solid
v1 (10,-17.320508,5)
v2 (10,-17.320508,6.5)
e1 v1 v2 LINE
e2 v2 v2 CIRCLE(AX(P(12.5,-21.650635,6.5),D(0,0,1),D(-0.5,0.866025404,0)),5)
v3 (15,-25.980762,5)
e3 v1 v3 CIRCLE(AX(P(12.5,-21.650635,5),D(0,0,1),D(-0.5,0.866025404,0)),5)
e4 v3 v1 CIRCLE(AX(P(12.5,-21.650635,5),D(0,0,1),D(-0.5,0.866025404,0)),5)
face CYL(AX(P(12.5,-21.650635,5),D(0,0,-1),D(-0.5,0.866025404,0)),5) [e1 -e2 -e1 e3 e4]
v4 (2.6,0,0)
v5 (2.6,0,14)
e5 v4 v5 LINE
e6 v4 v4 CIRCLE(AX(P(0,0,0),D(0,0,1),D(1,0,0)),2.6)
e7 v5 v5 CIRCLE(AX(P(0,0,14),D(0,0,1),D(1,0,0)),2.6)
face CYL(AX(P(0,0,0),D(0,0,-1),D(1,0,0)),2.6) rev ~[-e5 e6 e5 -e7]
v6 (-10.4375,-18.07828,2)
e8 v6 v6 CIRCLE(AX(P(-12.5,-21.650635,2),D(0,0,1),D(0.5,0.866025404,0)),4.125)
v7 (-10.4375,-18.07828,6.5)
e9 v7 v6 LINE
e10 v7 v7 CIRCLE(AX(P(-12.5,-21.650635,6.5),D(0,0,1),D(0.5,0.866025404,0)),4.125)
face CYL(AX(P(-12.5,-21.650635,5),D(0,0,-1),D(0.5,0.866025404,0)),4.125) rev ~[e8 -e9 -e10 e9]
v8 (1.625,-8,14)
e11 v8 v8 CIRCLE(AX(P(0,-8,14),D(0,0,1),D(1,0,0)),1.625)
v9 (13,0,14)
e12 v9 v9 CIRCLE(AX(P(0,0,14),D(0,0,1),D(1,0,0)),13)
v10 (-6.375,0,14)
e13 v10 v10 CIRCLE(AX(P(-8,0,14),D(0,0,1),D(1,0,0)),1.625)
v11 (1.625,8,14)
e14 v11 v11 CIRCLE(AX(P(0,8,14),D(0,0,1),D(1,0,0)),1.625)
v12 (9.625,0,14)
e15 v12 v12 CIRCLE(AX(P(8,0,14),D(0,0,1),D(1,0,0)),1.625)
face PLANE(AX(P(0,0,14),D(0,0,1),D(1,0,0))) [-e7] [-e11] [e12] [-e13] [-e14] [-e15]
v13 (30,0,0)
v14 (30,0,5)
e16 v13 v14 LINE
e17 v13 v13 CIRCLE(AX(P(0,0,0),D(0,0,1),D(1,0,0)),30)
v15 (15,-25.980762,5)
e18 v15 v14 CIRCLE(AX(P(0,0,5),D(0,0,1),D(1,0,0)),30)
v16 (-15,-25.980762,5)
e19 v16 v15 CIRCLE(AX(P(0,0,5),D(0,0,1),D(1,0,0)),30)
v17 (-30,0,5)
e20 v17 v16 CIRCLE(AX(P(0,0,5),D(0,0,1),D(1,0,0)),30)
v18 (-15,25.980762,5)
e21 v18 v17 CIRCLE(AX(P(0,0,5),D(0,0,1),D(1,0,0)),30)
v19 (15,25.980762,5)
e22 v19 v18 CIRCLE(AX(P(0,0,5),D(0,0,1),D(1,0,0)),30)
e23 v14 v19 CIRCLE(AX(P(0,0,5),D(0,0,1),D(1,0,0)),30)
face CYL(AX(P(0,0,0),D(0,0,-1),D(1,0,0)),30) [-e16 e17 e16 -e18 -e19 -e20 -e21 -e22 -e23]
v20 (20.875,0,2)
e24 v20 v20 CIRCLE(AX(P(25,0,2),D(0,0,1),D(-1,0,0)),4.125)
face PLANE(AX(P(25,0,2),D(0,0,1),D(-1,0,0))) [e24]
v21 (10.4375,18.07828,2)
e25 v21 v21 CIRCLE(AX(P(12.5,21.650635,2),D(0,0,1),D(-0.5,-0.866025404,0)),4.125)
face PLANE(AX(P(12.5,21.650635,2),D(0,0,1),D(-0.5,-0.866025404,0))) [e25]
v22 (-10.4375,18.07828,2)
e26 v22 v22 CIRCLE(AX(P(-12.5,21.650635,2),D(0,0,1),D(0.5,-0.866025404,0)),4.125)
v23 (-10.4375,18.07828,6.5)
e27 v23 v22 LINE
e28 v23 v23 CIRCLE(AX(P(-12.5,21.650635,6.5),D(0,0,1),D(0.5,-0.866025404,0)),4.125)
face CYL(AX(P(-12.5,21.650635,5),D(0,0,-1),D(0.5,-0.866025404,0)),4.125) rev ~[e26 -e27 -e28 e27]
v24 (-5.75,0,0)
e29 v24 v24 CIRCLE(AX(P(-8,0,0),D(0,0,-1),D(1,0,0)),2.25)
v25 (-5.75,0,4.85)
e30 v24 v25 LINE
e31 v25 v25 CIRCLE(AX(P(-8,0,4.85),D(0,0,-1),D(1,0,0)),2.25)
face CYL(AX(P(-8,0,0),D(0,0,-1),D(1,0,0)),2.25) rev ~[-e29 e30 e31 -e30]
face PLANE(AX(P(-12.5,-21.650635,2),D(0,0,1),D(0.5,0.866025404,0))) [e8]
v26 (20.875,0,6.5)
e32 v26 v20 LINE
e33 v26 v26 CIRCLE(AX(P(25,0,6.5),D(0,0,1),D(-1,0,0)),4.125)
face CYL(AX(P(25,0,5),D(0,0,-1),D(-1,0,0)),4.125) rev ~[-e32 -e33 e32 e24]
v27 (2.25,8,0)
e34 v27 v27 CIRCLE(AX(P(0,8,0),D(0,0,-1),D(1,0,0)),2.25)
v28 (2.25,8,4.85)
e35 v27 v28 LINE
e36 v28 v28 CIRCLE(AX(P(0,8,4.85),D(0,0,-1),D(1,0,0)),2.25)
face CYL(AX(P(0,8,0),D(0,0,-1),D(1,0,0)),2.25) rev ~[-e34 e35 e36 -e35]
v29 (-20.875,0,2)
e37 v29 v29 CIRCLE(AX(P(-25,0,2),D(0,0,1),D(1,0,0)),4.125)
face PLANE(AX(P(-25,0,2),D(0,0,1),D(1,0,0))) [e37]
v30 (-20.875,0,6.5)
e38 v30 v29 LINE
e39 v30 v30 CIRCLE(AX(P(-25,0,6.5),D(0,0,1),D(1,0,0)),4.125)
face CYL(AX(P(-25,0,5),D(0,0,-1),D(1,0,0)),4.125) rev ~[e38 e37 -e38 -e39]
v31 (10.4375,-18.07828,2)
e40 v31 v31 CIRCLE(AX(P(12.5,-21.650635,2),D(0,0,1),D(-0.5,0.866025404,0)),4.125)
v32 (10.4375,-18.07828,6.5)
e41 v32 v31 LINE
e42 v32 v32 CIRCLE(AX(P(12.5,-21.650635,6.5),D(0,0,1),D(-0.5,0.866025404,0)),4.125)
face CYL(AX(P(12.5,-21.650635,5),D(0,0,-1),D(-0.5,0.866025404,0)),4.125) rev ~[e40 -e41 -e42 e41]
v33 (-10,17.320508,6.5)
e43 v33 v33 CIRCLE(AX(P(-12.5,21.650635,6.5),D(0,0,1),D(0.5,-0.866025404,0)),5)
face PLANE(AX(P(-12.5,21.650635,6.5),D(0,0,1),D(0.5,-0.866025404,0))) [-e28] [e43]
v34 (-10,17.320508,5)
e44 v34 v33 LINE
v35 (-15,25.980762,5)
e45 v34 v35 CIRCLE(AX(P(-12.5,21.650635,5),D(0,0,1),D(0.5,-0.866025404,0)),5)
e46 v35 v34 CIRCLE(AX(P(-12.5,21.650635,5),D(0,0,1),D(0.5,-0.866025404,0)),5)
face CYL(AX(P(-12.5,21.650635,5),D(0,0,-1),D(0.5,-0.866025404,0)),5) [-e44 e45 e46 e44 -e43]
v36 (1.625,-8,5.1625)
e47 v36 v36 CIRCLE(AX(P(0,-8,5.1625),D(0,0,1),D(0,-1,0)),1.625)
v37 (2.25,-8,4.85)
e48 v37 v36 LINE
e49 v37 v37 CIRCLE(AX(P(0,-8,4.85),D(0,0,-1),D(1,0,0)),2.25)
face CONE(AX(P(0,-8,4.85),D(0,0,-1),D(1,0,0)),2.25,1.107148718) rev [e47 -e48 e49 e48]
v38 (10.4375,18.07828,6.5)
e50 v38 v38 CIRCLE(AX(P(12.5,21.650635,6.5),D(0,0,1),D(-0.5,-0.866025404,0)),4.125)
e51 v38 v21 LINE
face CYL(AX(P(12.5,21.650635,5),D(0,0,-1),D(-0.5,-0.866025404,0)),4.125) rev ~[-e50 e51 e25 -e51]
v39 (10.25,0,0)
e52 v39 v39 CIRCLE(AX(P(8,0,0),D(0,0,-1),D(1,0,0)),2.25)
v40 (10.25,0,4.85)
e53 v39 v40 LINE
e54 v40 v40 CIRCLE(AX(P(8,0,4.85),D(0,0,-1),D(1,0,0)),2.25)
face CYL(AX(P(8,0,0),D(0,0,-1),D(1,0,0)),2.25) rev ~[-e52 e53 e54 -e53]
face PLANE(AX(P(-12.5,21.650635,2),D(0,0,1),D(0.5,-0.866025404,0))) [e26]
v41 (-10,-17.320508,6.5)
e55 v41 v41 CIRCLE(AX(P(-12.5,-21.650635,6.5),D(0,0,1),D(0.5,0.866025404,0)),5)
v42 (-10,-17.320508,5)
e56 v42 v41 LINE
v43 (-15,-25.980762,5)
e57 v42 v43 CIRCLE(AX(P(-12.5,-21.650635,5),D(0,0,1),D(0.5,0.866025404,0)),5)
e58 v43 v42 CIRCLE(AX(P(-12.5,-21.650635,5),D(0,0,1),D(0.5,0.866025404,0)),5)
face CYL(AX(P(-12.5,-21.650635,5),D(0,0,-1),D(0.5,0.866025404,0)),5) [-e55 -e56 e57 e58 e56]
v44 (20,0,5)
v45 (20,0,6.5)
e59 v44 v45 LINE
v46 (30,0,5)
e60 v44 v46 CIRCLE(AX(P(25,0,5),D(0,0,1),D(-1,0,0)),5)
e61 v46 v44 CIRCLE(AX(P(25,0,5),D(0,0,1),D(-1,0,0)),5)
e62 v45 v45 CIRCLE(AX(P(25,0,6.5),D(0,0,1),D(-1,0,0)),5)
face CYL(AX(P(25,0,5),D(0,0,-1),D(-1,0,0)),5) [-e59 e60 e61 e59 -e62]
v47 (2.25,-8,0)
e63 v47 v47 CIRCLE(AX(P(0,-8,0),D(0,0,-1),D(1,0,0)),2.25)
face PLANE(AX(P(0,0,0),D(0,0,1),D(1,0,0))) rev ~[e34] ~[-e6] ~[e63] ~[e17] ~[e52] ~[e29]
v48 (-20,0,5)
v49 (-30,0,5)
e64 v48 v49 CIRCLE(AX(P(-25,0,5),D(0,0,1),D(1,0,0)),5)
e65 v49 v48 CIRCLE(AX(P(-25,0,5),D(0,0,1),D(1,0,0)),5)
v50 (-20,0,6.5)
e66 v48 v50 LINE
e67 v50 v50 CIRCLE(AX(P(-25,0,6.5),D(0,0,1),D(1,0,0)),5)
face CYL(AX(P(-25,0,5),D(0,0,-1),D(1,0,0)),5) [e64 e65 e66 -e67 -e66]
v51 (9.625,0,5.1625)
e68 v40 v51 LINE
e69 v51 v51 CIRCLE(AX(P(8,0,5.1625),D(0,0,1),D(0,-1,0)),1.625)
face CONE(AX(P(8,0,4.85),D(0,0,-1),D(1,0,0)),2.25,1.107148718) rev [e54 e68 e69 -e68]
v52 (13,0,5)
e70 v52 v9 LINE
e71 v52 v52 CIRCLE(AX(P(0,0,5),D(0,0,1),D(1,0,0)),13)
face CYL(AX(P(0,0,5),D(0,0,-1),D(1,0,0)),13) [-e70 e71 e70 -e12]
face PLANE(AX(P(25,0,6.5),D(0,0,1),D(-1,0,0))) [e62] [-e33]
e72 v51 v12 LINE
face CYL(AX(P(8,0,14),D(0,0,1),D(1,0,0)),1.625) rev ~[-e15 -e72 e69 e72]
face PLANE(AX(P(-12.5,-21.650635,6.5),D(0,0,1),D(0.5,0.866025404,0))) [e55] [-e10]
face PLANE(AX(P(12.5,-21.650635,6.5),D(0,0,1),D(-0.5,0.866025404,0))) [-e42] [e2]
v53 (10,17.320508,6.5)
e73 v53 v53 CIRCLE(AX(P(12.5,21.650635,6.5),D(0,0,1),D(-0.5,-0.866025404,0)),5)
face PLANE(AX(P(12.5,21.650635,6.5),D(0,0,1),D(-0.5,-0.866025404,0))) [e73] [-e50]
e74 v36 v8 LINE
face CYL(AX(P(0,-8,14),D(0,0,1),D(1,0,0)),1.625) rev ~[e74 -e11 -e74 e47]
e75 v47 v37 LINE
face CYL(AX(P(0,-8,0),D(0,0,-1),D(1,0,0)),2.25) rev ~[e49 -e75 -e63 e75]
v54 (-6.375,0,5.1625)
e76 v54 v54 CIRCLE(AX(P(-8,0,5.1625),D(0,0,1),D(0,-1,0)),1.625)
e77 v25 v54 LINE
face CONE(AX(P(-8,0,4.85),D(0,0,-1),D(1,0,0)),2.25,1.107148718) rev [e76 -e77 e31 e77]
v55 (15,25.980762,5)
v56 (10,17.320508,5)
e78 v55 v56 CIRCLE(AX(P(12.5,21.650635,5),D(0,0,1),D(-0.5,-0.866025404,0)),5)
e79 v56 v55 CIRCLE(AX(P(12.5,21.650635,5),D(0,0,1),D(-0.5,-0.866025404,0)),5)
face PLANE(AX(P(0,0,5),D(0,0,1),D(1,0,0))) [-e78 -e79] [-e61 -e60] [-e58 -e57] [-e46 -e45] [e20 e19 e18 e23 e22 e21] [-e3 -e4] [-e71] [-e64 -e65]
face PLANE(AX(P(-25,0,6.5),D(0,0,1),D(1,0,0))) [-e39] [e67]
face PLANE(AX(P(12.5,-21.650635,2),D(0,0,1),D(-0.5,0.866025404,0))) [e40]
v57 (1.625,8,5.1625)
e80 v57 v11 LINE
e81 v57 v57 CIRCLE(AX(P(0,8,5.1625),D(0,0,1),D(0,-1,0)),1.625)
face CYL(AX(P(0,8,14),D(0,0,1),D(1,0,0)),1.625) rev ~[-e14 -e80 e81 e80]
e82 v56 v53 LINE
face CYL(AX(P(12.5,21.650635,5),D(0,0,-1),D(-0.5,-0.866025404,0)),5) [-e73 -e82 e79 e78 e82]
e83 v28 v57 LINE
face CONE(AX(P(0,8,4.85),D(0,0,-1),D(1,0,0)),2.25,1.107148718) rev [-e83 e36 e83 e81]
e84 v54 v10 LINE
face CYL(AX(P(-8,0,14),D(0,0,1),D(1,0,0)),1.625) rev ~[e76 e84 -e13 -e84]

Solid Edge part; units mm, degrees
sketch "Sketch1" plane through (0, 0, 0) normal (0, 0, 1) x (1, 0, 0)
  circle A0 centre (0, 0) radius 30
  circle A1 centre (0, 0) radius 2.6
extrude "Protrusion1" add sketch "Sketch1" along normal blind 5
sketch "Sketch2" plane through (0, 0, 5) normal (0, 0, 1) x (1, 0, 0)
  circle A0 centre (-25, 0) radius 4.125
extrude "ExtrudedCutout_1" cut sketch "Sketch2" against normal blind 3
sketch "Sketch3" plane through (0, 0, 5) normal (0, 0, 1) x (1, 0, 0)
  circle A0 centre (-25, 0) radius 5
  circle A1 centre (-25, 0) radius 4.125
  dimension "D1" = 25
extrude "ExtrudedProtrusion_2" add sketch "Sketch3" along normal blind 1.5
sketch "Sketch4" plane through (0, 0, 5) normal (0, 0, 1) x (1, 0, 0)
  circle A0 centre (0, 0) radius 2.6
  circle A1 centre (0, 0) radius 13
extrude "ExtrudedProtrusion_3" add sketch "Sketch4" along normal blind 9
pattern_circular "Pattern1" count 6 over 360 about axis through (0, 0, 0) along (0, 0, -1) of "ExtrudedCutout_1", "ExtrudedProtrusion_2"
sketch "Sketch5" plane through (0, 0, 14) normal (0, 0, 1) x (1, 0, 0)
  circle A0 centre (-8, 0) radius 1.625
  circle A1 centre (0, 8) radius 1.625
  circle A2 centre (8, 0) radius 1.625
  circle A3 centre (0, -8) radius 1.625
  dimension "D1" = 8
  dimension "D2" = 8
  dimension "D3" = 8
  dimension "D4" = 8
extrude "Cutout1" cut sketch "Sketch5" against normal up to next
sketch "Sketch6" plane through (0, 0, 0) normal (0, 0, -1) x (1, 0, 0)
  circle A0 centre (8, 0) radius 2.25
  circle A1 centre (8, 0) radius 1.625
  circle A2 centre (0, -8) radius 2.25
  circle A3 centre (0, -8) radius 1.625
  circle A4 centre (0, 8) radius 2.25
  circle A5 centre (0, 8) radius 1.625
  circle A6 centre (-8, 0) radius 2.25
  circle A7 centre (-8, 0) radius 1.625
extrude "Cutout2" cut sketch "Sketch6" against normal blind 5.25
chamfer "Chamfer_3" distance 0.8 distance2 0.4 4 edges at (-2.25, -8, 5.25) (5.75, 0, 5.25) (-2.25, 8, 5.25) (-10.25, 0, 5.25) measured on face at (1.545, -9.455, 5.25) measured on face at (-6.455, -1.455, 5.25) measured on face at (9.545, -1.455, 5.25) measured on face at (1.545, 6.545, 5.25) measured on face at (1.545, -9.455, 5.25) measured on face at (-6.455, -1.455, 5.25) measured on face at (9.545, -1.455, 5.25) measured on face at (1.545, 6.545, 5.25) measured on face at (1.545, -9.455, 5.25) measured on face at (-6.455, -1.455, 5.25) measured on face at (9.545, -1.455, 5.25) measured on face at (1.545, 6.545, 5.25) measured on face at (1.545, -9.455, 5.25) measured on face at (-6.455, -1.455, 5.25) measured on face at (9.545, -1.455, 5.25) measured on face at (1.545, 6.545, 5.25)
